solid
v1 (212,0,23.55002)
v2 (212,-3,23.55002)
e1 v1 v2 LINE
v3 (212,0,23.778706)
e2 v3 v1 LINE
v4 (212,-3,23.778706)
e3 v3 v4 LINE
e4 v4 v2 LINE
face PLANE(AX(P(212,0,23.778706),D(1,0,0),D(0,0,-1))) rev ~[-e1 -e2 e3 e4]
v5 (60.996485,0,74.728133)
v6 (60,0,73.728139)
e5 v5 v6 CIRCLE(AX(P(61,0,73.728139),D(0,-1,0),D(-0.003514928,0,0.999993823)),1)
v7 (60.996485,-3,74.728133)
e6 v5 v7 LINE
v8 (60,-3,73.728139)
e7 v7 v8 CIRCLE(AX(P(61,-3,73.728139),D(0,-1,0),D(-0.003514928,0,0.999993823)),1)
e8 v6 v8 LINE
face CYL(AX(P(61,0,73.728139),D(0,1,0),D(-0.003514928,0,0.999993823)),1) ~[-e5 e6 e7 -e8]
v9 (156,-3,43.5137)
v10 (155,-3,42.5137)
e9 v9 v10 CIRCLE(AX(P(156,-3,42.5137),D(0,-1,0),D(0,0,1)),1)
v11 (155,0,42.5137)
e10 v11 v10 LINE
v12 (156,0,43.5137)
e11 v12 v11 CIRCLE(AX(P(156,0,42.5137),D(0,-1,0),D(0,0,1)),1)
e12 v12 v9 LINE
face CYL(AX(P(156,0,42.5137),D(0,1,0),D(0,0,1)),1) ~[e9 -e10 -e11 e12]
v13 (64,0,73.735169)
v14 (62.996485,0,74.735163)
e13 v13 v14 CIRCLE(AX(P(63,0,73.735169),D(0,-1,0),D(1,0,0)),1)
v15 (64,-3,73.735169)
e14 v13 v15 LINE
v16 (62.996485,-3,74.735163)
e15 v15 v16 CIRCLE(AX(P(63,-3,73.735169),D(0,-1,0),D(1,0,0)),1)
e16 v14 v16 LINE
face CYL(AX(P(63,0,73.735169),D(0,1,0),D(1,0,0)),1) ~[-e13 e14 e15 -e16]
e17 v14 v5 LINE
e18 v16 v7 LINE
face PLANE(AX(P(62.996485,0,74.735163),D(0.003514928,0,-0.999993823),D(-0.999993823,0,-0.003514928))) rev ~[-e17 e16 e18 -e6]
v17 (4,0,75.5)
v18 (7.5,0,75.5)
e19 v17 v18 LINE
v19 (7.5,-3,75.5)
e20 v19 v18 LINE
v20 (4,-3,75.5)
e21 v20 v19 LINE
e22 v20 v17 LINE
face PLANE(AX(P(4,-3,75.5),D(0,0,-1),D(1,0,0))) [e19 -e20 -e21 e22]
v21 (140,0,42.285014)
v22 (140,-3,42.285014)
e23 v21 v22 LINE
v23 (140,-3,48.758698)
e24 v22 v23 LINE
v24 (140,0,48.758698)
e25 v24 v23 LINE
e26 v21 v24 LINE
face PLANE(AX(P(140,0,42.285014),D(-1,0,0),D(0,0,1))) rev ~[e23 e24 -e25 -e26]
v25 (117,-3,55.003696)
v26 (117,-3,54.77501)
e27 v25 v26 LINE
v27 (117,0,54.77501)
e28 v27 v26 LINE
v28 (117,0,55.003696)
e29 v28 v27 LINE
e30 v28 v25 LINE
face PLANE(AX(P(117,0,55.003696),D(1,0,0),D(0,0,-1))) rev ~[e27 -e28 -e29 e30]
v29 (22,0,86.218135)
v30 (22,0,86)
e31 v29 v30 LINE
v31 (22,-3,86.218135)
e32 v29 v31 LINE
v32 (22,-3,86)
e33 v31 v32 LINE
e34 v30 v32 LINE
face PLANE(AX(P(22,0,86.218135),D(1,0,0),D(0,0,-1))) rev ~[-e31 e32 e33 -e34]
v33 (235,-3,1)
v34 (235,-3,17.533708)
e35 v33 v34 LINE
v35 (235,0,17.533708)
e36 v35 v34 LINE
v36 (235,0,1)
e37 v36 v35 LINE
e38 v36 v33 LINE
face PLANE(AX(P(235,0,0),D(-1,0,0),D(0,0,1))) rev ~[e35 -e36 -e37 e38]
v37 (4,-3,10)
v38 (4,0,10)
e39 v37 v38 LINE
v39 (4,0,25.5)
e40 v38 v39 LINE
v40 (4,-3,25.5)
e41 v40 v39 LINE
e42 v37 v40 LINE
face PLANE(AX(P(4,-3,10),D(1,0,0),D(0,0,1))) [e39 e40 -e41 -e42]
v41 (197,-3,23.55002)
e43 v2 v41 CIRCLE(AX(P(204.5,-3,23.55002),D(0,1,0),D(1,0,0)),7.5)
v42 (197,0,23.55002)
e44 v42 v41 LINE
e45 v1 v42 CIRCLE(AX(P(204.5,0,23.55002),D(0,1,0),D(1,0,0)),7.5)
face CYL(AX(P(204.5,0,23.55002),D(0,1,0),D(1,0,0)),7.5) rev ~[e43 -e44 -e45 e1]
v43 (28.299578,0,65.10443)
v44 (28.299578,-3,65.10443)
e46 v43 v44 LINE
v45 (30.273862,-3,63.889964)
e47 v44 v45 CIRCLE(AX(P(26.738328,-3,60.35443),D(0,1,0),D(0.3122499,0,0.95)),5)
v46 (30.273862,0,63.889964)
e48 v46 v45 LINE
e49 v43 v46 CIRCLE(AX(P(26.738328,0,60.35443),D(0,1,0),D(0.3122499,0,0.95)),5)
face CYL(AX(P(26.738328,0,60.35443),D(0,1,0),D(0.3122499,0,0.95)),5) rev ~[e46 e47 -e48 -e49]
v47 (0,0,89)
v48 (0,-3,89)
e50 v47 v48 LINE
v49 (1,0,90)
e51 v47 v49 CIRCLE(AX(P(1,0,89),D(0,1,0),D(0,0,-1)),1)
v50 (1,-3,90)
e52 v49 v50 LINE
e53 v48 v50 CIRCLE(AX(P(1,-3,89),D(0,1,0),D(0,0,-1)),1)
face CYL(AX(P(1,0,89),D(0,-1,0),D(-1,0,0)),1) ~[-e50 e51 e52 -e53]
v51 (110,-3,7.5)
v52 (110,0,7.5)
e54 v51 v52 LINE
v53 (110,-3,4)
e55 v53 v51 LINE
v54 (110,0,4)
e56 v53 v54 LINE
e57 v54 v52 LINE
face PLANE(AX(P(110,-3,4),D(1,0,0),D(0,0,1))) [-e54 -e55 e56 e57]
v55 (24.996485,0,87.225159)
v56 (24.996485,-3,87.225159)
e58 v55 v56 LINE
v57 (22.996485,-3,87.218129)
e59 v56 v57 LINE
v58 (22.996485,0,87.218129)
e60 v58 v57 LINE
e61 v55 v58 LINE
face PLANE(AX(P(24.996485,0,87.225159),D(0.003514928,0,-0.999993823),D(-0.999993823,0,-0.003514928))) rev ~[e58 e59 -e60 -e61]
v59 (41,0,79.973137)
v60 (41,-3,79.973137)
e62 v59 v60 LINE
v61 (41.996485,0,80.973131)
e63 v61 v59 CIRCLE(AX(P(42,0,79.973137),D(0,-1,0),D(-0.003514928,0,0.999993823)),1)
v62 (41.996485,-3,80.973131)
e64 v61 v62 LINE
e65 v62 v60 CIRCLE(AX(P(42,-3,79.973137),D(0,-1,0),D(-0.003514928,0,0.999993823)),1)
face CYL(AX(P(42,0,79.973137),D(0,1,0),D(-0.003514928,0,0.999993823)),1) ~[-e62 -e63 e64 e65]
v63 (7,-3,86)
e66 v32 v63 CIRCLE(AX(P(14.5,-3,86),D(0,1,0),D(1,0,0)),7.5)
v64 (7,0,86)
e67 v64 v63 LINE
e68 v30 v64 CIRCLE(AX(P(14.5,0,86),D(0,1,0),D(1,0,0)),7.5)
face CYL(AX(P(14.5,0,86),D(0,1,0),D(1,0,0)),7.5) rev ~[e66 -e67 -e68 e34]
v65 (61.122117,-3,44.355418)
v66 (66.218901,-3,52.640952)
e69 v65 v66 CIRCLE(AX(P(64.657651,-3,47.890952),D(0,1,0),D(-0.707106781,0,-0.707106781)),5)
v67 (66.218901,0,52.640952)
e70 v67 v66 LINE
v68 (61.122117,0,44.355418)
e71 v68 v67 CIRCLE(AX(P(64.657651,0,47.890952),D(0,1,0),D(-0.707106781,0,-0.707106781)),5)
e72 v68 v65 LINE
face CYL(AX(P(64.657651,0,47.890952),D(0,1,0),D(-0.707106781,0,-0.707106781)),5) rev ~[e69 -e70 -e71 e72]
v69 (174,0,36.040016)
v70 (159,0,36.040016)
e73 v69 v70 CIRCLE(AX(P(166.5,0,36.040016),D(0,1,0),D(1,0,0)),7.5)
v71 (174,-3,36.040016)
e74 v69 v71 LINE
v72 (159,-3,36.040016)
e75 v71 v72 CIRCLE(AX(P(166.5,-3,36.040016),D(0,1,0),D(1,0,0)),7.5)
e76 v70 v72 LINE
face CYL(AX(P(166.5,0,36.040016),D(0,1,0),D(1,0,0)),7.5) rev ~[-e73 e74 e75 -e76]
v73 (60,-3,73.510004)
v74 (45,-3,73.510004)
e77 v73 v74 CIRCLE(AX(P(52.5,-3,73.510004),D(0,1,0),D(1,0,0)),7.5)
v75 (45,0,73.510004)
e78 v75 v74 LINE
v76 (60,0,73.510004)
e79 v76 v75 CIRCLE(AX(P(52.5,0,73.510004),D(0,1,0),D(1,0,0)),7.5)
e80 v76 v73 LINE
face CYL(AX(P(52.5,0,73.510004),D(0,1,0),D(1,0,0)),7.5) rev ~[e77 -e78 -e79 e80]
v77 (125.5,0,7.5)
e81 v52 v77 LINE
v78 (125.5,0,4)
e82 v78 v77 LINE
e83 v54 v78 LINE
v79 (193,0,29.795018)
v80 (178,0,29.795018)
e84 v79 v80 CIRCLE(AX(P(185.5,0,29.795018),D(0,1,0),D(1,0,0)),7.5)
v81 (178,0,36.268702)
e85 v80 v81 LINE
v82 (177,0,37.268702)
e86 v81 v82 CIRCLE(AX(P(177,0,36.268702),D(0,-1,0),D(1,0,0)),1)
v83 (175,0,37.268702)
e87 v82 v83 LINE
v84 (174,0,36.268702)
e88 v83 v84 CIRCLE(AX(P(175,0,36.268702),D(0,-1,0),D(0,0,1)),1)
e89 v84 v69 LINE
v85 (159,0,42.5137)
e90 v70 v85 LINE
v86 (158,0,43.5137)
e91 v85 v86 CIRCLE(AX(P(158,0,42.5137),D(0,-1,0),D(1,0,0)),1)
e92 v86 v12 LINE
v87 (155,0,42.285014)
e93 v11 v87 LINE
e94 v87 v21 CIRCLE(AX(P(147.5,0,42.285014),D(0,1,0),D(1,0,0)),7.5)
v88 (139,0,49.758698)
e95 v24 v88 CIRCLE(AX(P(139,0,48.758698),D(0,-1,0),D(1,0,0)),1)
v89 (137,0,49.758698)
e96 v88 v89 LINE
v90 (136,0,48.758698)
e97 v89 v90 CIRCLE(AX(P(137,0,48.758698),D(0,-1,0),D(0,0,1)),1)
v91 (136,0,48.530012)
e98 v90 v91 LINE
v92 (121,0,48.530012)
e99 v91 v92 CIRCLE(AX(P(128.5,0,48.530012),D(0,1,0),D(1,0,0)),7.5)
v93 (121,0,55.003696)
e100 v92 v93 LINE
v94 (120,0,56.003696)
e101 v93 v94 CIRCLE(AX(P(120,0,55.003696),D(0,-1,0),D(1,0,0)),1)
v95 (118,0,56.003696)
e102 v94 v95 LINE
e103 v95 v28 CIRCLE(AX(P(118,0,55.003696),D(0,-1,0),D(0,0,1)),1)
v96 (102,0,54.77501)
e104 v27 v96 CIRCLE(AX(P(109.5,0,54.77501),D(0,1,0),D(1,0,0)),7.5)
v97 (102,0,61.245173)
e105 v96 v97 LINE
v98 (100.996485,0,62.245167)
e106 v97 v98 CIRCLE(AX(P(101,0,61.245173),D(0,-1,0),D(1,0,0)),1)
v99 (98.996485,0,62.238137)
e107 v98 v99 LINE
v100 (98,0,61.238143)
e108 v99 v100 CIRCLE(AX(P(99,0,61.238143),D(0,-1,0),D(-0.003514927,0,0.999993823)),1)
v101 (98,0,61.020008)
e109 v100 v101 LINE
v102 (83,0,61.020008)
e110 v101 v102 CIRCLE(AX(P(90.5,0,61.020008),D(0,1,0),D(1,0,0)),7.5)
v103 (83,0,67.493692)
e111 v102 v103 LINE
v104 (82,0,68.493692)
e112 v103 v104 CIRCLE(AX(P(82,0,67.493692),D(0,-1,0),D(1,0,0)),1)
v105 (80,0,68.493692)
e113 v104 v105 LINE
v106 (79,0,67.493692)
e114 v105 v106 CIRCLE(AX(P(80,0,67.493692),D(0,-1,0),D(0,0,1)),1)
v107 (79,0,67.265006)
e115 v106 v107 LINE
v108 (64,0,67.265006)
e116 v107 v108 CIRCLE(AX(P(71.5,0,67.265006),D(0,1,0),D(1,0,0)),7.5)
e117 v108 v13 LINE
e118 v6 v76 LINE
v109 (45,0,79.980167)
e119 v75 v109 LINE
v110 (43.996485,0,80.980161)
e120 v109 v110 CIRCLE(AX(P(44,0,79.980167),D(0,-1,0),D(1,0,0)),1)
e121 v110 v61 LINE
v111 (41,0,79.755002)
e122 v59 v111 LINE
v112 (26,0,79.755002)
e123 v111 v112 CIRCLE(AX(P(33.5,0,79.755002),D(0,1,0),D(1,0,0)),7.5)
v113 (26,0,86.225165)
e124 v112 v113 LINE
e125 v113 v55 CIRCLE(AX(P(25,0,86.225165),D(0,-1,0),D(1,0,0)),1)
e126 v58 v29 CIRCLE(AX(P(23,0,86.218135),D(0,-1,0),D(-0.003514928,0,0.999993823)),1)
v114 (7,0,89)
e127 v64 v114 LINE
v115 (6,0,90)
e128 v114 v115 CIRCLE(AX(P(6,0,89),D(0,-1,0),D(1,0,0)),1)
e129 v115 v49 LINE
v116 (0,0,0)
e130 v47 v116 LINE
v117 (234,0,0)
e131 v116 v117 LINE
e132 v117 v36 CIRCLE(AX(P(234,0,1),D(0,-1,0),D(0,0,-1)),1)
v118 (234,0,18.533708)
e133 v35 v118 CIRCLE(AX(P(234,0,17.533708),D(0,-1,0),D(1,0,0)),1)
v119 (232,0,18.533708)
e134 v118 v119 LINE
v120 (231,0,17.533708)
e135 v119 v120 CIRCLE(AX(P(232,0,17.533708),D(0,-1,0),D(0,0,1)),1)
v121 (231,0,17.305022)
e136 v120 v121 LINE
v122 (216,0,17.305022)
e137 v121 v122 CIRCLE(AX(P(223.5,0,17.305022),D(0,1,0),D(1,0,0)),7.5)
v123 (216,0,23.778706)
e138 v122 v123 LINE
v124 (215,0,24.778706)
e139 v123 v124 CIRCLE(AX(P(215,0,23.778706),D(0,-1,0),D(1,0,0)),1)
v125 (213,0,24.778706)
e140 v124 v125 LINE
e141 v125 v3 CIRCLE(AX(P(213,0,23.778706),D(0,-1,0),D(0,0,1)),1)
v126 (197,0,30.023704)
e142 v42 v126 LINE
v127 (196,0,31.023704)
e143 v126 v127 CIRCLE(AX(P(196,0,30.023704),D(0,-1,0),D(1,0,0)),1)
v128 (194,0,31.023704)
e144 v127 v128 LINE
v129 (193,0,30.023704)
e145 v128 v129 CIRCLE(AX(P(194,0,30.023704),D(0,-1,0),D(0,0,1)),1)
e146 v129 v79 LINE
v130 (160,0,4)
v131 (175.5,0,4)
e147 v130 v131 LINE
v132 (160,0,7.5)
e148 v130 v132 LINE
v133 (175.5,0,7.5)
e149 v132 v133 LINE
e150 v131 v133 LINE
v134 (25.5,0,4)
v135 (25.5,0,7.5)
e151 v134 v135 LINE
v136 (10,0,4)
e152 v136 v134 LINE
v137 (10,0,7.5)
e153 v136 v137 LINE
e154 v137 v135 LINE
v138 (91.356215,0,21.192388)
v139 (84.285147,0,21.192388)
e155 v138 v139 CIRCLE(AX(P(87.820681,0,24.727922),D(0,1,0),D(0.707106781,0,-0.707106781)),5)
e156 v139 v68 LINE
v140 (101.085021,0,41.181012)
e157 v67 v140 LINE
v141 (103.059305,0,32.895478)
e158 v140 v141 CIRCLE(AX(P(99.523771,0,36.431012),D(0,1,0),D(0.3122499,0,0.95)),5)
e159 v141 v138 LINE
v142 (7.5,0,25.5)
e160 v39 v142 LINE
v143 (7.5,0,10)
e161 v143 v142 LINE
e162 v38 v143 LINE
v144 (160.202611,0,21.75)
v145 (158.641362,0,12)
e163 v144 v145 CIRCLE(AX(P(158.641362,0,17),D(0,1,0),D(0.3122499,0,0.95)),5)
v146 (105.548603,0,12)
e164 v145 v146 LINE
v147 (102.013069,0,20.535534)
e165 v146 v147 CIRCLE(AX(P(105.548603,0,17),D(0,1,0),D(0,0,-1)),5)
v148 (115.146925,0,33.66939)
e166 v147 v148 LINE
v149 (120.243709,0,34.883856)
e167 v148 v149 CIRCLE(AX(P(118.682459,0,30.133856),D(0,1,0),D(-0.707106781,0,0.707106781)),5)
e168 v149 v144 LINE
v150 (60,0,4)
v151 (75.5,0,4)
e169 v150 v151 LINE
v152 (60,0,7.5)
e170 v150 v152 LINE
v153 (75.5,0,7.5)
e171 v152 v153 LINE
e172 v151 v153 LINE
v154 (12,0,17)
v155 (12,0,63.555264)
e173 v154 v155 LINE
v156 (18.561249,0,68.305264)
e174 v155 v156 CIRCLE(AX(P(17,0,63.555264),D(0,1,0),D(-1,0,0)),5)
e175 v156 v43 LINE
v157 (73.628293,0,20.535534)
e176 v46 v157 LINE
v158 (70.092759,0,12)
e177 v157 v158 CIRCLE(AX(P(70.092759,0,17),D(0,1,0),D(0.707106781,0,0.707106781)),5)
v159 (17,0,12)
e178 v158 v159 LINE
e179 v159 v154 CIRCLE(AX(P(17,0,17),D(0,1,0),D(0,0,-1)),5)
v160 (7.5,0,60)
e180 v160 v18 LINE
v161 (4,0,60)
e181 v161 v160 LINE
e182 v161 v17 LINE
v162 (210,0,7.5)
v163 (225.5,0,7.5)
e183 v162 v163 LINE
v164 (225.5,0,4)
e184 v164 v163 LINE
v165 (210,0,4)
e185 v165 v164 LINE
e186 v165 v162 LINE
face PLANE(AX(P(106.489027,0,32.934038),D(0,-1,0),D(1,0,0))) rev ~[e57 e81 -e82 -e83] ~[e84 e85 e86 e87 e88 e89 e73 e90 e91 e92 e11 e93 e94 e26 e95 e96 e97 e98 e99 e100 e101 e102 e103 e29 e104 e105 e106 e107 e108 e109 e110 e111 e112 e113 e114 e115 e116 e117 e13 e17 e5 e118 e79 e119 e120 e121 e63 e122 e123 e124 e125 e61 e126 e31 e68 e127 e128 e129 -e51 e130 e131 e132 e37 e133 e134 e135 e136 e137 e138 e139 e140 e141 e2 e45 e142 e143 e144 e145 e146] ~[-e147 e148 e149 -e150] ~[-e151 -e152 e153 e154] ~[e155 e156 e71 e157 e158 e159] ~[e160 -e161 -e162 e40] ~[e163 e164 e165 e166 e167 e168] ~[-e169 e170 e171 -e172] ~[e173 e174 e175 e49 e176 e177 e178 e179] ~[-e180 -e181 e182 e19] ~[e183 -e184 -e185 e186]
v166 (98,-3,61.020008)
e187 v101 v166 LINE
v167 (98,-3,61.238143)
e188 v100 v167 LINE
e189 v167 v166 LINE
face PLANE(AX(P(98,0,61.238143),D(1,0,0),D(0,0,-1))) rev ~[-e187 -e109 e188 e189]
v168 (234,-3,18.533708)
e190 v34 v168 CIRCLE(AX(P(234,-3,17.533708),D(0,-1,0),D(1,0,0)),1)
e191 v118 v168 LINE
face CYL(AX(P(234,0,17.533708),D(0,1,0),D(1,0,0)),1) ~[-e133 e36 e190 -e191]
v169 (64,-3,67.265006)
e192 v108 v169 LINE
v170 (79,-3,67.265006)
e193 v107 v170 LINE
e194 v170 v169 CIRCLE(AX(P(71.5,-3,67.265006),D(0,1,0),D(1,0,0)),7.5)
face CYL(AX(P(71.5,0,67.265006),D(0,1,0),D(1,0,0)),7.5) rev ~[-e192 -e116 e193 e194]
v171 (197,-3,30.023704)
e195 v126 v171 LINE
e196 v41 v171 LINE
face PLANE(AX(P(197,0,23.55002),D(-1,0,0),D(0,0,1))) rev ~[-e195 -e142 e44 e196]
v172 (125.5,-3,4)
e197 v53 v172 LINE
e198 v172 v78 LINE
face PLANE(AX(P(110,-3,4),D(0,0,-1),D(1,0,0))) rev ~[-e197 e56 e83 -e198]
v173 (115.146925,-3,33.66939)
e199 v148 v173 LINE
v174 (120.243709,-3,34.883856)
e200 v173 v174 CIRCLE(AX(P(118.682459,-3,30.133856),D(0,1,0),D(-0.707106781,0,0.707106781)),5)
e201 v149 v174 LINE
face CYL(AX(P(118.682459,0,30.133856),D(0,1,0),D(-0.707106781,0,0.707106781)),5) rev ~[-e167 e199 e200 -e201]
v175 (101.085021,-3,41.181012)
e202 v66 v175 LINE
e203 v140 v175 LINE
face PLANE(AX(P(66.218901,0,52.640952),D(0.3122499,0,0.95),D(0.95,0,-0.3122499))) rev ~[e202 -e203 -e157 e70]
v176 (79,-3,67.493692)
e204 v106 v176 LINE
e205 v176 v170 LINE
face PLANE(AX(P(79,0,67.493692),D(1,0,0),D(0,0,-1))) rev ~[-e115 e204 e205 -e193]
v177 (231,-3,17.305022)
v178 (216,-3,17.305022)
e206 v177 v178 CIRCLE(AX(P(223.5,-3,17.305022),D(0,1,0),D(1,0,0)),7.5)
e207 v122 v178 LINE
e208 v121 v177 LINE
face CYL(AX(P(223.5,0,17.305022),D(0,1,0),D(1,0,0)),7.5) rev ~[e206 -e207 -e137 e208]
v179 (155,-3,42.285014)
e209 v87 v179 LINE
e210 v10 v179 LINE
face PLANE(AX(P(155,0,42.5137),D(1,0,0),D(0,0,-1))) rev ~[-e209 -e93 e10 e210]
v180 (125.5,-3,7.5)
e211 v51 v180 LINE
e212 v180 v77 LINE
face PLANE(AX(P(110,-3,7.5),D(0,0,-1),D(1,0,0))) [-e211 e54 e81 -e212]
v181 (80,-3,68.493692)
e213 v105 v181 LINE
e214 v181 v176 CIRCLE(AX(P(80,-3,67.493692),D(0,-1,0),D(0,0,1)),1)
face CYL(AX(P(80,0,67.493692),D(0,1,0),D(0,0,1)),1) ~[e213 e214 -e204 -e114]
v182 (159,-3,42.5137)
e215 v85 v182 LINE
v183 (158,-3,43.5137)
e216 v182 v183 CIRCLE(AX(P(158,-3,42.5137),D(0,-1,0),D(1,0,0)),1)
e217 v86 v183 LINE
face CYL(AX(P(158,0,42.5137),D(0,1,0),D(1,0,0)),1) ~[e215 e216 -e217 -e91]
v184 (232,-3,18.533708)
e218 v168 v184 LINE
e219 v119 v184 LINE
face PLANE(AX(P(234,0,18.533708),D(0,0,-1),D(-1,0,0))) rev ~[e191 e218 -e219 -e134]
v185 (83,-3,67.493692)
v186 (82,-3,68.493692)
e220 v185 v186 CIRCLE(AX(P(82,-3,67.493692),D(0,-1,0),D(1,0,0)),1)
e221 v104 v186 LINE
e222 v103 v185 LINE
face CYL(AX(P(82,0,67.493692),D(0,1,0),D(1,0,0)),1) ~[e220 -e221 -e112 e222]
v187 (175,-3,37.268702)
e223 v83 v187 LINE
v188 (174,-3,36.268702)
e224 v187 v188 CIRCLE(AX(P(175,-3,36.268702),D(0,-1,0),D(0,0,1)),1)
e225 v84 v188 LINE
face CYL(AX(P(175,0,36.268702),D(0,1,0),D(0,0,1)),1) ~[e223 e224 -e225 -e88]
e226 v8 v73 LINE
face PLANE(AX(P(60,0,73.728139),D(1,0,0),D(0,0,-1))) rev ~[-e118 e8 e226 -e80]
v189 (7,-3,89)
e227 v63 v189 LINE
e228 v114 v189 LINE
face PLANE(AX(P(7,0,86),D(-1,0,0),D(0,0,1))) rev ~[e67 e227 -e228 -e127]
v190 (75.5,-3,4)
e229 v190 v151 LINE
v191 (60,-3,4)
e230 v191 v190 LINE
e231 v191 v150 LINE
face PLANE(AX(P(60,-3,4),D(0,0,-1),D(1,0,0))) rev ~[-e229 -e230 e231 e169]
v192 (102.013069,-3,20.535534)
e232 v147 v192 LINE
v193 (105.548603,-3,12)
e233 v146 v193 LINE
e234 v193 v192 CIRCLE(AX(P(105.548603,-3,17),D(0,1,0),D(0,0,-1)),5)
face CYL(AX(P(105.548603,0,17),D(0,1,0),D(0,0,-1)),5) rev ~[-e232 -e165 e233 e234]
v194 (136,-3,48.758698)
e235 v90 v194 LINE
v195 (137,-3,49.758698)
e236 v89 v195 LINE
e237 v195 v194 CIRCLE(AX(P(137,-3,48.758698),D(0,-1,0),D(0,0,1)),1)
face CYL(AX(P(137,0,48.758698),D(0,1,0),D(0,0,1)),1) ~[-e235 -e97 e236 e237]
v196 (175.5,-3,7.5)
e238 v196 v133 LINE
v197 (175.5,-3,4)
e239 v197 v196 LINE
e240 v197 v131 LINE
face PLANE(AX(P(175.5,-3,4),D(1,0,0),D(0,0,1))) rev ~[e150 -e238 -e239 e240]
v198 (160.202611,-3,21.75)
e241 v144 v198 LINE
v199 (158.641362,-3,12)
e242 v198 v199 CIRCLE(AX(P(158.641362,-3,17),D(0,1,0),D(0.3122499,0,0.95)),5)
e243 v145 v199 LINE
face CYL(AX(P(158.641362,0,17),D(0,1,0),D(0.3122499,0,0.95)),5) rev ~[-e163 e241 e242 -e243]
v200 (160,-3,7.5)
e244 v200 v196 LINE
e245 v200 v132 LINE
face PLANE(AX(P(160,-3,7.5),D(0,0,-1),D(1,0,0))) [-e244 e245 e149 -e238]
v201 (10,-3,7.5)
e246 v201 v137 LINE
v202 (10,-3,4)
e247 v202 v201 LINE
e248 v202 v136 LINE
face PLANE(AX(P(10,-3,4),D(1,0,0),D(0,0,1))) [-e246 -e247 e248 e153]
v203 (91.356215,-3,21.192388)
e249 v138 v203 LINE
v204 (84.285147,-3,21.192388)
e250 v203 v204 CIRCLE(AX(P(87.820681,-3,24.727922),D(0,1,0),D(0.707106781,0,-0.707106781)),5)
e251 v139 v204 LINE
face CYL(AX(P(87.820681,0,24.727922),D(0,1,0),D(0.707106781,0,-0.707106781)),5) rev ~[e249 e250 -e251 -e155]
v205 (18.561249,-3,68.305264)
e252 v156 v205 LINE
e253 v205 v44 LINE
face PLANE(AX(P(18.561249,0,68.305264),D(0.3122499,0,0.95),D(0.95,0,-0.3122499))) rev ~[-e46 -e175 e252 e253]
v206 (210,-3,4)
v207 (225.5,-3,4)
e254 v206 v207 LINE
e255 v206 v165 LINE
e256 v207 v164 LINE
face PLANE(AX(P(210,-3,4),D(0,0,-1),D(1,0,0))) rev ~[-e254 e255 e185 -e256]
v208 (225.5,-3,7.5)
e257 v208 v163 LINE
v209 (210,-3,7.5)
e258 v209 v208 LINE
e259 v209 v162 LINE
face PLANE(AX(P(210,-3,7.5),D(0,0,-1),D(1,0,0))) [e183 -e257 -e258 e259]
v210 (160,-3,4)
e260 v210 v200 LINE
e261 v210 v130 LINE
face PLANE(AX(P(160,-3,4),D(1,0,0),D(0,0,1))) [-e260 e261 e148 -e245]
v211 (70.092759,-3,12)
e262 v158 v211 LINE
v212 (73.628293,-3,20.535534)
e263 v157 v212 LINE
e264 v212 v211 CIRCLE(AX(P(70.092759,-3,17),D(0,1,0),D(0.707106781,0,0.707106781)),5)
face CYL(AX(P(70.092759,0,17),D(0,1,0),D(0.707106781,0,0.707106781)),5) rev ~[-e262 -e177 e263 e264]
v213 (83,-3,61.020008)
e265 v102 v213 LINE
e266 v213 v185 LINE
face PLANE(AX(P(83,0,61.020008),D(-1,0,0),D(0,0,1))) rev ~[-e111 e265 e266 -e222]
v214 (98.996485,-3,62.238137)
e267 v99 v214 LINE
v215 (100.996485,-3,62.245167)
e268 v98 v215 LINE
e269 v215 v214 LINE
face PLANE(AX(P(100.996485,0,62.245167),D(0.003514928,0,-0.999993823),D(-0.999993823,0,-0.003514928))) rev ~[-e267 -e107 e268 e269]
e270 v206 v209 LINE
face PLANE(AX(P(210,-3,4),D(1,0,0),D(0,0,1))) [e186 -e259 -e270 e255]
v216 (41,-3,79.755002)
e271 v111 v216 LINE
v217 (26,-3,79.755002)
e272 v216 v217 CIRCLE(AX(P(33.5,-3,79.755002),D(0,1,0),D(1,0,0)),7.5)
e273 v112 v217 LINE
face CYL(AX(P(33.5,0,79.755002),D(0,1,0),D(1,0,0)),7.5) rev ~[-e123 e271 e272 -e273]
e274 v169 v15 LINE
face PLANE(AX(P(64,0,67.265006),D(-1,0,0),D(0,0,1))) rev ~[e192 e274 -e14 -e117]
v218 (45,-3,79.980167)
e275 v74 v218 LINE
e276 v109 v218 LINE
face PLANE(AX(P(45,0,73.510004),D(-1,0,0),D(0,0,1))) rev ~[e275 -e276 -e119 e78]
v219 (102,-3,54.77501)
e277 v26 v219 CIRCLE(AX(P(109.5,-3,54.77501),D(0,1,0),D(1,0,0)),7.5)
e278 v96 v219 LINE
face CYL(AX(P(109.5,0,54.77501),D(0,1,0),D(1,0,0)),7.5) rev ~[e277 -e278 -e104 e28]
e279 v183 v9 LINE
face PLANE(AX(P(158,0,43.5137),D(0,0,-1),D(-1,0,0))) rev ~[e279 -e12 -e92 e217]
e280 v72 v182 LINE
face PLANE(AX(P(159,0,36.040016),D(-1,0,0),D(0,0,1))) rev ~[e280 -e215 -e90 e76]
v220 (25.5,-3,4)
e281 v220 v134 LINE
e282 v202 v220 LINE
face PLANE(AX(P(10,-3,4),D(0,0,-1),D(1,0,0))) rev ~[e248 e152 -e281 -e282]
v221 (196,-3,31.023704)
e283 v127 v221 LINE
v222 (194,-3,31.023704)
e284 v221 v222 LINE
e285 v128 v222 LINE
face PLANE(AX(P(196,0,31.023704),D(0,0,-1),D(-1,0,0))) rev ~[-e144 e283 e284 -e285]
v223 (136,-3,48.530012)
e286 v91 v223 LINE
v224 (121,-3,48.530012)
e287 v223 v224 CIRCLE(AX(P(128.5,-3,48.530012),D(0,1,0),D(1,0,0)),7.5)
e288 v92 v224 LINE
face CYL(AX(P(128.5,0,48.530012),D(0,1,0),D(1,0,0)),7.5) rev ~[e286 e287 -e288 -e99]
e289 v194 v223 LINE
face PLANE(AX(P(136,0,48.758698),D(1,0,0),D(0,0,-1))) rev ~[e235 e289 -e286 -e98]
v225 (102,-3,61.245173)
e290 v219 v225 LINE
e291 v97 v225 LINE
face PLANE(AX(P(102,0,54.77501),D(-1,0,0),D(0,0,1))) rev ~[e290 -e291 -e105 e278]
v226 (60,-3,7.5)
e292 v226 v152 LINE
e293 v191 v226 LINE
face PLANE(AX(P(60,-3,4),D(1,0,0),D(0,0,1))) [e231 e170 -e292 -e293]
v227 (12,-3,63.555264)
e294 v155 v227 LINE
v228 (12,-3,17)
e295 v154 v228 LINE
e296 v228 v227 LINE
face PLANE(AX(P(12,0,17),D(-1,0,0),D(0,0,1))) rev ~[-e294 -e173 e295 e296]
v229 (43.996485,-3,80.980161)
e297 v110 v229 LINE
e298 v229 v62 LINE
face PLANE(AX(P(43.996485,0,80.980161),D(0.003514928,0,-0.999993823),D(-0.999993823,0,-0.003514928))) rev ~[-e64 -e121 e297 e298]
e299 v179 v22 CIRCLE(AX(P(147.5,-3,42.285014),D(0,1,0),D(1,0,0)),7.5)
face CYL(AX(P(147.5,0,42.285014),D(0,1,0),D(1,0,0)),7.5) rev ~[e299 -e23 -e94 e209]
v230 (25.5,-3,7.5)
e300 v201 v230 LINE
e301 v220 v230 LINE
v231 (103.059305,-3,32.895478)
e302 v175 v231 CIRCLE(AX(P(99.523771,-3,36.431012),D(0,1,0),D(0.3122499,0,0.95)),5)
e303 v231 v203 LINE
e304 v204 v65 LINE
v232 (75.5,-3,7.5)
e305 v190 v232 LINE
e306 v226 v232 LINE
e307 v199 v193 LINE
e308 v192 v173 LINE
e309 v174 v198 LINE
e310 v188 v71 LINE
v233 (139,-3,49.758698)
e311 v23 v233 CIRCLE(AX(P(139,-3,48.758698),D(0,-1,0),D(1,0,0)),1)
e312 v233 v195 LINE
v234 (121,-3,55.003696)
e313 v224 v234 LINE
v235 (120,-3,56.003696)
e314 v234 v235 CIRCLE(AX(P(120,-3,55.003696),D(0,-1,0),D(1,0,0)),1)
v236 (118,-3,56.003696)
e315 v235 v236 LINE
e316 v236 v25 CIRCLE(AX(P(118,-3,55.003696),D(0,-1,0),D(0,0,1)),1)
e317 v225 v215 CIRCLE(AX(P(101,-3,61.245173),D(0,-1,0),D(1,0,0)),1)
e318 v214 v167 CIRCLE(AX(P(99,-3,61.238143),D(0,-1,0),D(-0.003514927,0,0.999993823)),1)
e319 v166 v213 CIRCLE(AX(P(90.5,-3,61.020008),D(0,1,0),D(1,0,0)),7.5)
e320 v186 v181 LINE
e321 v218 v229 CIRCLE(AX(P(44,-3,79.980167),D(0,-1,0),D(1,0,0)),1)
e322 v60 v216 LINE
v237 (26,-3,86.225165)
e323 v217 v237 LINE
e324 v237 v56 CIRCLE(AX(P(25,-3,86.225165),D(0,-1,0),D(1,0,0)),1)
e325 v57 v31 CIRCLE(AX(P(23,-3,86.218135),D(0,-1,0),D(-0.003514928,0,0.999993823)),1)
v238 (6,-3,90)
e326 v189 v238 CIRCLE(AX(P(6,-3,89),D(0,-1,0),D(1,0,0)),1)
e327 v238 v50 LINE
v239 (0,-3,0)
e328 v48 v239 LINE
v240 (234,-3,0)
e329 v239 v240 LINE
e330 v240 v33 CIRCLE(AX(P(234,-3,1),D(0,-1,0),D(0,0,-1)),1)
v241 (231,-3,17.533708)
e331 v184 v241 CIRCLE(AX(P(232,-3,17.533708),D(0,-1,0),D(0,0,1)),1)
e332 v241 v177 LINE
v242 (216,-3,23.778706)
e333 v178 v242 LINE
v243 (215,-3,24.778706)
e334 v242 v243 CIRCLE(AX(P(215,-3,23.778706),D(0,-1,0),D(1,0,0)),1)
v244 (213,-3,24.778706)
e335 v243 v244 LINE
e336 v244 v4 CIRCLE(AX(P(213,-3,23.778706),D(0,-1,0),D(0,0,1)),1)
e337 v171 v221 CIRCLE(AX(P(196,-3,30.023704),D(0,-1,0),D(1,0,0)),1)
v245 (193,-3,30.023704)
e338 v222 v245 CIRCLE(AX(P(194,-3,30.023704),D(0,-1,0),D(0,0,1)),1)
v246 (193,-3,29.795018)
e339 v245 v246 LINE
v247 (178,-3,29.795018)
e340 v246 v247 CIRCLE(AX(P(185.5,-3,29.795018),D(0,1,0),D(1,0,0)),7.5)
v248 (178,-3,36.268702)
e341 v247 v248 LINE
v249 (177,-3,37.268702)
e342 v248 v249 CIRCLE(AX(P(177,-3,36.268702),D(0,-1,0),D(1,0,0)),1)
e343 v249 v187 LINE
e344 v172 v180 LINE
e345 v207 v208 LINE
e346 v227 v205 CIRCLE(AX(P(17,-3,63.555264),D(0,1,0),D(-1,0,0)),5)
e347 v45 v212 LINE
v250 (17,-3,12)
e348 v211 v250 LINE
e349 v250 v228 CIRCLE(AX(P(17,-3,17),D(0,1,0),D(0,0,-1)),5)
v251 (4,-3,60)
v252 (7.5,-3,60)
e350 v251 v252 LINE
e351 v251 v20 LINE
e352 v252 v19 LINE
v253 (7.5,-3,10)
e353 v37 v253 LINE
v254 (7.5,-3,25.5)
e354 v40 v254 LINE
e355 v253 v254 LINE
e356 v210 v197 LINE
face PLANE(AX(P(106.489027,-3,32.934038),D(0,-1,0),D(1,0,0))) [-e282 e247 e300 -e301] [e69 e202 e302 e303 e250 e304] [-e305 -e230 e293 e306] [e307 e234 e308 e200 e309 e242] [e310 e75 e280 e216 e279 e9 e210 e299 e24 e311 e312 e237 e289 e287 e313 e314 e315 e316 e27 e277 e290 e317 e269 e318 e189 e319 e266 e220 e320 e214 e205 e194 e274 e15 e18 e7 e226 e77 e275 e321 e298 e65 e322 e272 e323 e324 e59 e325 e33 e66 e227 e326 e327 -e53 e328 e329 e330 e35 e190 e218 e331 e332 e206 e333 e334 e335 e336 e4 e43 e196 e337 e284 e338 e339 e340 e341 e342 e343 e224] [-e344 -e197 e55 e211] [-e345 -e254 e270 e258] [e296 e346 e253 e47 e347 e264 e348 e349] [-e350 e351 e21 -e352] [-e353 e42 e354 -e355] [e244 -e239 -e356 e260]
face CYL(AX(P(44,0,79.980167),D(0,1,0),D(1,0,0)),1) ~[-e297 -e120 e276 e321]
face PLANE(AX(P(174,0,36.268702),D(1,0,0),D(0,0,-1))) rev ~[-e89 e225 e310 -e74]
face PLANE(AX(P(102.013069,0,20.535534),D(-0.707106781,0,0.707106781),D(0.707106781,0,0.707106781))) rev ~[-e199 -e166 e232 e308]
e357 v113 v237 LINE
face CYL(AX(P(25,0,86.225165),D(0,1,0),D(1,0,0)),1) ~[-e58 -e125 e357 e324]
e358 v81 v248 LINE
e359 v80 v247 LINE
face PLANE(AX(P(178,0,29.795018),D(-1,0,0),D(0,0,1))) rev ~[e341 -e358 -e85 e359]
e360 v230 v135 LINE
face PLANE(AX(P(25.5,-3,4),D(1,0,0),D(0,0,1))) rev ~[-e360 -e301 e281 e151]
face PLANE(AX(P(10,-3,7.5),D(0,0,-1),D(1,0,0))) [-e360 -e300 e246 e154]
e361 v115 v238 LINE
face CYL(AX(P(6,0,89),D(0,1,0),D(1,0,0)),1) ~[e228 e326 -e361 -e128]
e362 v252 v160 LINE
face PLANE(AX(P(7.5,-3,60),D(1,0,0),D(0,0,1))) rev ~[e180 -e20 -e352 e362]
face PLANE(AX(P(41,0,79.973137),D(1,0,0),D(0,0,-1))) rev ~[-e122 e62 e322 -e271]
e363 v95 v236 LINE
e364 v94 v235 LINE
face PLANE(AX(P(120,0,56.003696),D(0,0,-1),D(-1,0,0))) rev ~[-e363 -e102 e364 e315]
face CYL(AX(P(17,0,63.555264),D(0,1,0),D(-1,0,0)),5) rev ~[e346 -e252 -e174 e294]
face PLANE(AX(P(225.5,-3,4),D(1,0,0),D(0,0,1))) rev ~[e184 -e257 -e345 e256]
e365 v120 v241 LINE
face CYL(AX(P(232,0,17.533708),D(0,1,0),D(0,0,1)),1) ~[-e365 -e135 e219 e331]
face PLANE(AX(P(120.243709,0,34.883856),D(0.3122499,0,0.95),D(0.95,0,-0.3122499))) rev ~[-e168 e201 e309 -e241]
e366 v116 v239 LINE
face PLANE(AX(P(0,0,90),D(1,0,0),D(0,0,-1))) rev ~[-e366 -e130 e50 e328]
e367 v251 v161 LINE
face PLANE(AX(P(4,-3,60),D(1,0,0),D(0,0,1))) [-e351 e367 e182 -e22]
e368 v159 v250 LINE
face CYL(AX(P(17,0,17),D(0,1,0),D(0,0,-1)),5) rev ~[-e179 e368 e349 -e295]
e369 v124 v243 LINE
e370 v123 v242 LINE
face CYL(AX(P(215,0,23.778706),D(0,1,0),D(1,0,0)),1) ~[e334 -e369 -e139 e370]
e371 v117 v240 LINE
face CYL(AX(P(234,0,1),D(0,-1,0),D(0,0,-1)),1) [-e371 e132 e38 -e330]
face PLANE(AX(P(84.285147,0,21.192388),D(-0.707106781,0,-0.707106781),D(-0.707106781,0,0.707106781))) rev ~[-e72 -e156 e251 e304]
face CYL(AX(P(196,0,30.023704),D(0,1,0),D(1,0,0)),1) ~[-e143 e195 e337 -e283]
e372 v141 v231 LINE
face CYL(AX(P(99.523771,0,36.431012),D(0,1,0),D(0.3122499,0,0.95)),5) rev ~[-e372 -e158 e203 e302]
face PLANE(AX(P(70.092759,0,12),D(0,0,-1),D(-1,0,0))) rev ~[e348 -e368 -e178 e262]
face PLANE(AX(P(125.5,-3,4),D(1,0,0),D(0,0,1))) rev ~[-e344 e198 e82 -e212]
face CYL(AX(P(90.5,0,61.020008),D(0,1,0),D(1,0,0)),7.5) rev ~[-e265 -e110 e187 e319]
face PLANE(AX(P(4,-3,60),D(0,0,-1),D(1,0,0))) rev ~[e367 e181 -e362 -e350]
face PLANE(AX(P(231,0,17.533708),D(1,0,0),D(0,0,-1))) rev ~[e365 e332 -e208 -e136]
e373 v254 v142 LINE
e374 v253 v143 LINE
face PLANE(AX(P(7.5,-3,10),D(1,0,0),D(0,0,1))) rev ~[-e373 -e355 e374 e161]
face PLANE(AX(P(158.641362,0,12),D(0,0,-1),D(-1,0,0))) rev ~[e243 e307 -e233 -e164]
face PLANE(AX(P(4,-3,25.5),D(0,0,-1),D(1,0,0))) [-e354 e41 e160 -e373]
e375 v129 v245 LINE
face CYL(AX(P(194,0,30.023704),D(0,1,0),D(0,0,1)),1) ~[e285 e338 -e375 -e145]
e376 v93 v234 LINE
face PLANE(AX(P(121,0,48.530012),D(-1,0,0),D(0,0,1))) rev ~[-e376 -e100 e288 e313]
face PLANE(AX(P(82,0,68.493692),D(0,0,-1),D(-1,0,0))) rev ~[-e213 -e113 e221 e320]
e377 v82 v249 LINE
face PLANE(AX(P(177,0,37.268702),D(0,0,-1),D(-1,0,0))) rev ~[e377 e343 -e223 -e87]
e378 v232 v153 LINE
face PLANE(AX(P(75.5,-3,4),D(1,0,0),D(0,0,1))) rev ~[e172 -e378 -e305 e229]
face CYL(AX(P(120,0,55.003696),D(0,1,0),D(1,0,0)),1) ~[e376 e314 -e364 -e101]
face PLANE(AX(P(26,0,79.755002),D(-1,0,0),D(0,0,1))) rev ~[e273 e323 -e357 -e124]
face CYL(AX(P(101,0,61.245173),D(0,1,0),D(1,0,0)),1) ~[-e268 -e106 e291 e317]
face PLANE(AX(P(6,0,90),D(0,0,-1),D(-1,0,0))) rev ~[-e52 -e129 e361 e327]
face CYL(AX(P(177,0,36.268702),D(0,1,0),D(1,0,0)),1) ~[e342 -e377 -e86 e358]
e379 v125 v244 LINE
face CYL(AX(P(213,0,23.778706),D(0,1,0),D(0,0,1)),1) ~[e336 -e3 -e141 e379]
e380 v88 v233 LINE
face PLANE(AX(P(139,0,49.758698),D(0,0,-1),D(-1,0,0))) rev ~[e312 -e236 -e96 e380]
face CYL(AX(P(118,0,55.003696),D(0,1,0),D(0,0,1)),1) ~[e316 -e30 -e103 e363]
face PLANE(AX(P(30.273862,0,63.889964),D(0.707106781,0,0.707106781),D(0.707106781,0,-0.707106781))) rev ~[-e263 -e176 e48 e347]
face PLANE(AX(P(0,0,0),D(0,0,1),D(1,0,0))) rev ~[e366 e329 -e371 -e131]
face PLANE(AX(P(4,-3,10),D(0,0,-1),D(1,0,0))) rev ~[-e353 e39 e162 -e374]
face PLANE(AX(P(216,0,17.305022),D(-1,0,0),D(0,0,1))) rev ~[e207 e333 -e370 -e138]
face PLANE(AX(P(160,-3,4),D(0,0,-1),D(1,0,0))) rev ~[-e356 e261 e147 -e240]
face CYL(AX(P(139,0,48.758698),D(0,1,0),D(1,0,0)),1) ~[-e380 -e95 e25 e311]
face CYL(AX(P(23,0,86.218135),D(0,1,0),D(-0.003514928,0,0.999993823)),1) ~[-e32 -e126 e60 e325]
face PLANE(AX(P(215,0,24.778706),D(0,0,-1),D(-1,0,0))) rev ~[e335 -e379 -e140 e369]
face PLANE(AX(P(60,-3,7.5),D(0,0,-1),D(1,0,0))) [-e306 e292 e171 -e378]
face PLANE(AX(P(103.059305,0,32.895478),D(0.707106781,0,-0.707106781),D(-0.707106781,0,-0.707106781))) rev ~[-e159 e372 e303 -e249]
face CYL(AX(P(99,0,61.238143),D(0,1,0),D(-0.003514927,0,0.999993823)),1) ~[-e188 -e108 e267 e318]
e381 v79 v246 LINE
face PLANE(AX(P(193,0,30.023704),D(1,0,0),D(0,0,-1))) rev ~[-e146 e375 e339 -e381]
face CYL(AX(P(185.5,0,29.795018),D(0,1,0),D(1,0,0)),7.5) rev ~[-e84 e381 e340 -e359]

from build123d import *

# Parameters (mm, degrees)
F1_DEPTH = 3
F2_R     = 1
F3_W     = 15.5
F3_H     = 3.5
F3_W_2   = 3.5
F3_H_2   = 15.5
F4_DEPTH = 25


with BuildPart() as f1:
    # F0 (on Front) → F1 (new body)
    with BuildSketch(Plane.XZ):
        with BuildLine():
            Line((0, 90), (0, 0))
            Line((0, 0), (235, 0))
            Line((235, 0), (235, 17.5337082297))
            ThreePointArc((235, 17.5337082297), (234.7071067812, 18.2408150109), (234, 18.5337082297))
            Line((234, 18.5337082297), (232, 18.5337082297))
            ThreePointArc((232, 18.5337082297), (231.2928932188, 18.2408150109), (231, 17.5337082297))
            Line((231, 17.5337082297), (231, 17.3050220176))
            ThreePointArc((231, 17.3050220176), (223.5, 9.8050220176), (216, 17.3050220176))
            Line((216, 17.3050220176), (216, 21.3050220176))
            Line((216, 21.3050220176), (216, 23.7787062281))
            ThreePointArc((216, 23.7787062281), (215.7071067812, 24.4858130093), (215, 24.7787062281))
            Line((215, 24.7787062281), (213, 24.7787062281))
            ThreePointArc((213, 24.7787062281), (212.2928932188, 24.4858130093), (212, 23.7787062281))
            Line((212, 23.7787062281), (212, 23.550020016))
            ThreePointArc((212, 23.550020016), (204.5, 16.050020016), (197, 23.550020016))
            Line((197, 23.550020016), (197, 27.550020016))
            Line((197, 27.550020016), (197, 30.0237042265))
            ThreePointArc((197, 30.0237042265), (196.7071067812, 30.7308110077), (196, 31.0237042265))
            Line((196, 31.0237042265), (194, 31.0237042265))
            ThreePointArc((194, 31.0237042265), (193.2928932188, 30.7308110077), (193, 30.0237042265))
            Line((193, 30.0237042265), (193, 29.7950180144))
            ThreePointArc((193, 29.7950180144), (185.5, 22.2950180144), (178, 29.7950180144))
            Line((178, 29.7950180144), (178, 33.7950180144))
            Line((178, 33.7950180144), (178, 36.2687022249))
            ThreePointArc((178, 36.2687022249), (177.7071067812, 36.9758090061), (177, 37.2687022249))
            Line((177, 37.2687022249), (175, 37.2687022249))
            ThreePointArc((175, 37.2687022249), (174.2928932188, 36.9758090061), (174, 36.2687022249))
            Line((174, 36.2687022249), (174, 36.0400160128))
            ThreePointArc((174, 36.0400160128), (166.5, 28.5400160128), (159, 36.0400160128))
            Line((159, 36.0400160128), (159, 40.0400160128))
            Line((159, 40.0400160128), (159, 42.5137002233))
            ThreePointArc((159, 42.5137002233), (158.7071067812, 43.2208070045), (158, 43.5137002233))
            Line((158, 43.5137002233), (156, 43.5137002233))
            ThreePointArc((156, 43.5137002233), (155.2928932188, 43.2208070045), (155, 42.5137002233))
            Line((155, 42.5137002233), (155, 42.2850140112))
            ThreePointArc((155, 42.2850140112), (147.5, 34.7850140112), (140, 42.2850140112))
            Line((140, 42.2850140112), (140, 46.2850140112))
            Line((140, 46.2850140112), (140, 48.7586982217))
            ThreePointArc((140, 48.7586982217), (139.7071067812, 49.4658050029), (139, 49.7586982217))
            Line((139, 49.7586982217), (137, 49.7586982217))
            ThreePointArc((137, 49.7586982217), (136.2928932188, 49.4658050029), (136, 48.7586982217))
            Line((136, 48.7586982217), (136, 48.5300120096))
            ThreePointArc((136, 48.5300120096), (128.5, 41.0300120096), (121, 48.5300120096))
            Line((121, 48.5300120096), (121, 52.5300120096))
            Line((121, 52.5300120096), (121, 55.0036962201))
            ThreePointArc((121, 55.0036962201), (120.7071067812, 55.7108030013), (120, 56.0036962201))
            Line((120, 56.0036962201), (118, 56.0036962201))
            ThreePointArc((118, 56.0036962201), (117.2928932188, 55.7108030013), (117, 55.0036962201))
            Line((117, 55.0036962201), (117, 54.775010008))
            ThreePointArc((117, 54.775010008), (109.5, 47.275010008), (102, 54.775010008))
            Line((102, 54.775010008), (102, 58.775010008))
            Line((102, 58.775010008), (102, 61.2451730918))
            ThreePointArc((102, 61.2451730918), (101.7058629727, 61.9535214974), (100.9964850724, 62.2451669144))
            Line((100.9964850724, 62.2451669144), (98.9964850724, 62.2381370157))
            ThreePointArc((98.9964850724, 62.2381370157), (98.2916515943, 61.9440061658), (98, 61.2381431931))
            Line((98, 61.2381431931), (98, 61.0200080064))
            ThreePointArc((98, 61.0200080064), (90.5, 53.5200080064), (83, 61.0200080064))
            Line((83, 61.0200080064), (83, 65.0200080064))
            Line((83, 65.0200080064), (83, 67.4936922169))
            ThreePointArc((83, 67.4936922169), (82.7071067812, 68.2007989981), (82, 68.4936922169))
            Line((82, 68.4936922169), (80, 68.4936922169))
            ThreePointArc((80, 68.4936922169), (79.2928932188, 68.2007989981), (79, 67.4936922169))
            Line((79, 67.4936922169), (79, 67.2650060048))
            ThreePointArc((79, 67.2650060048), (71.5, 59.7650060048), (64, 67.2650060048))
            Line((64, 67.2650060048), (64, 71.2650060048))
            Line((64, 71.2650060048), (64, 73.7351690886))
            ThreePointArc((64, 73.7351690886), (63.7058629727, 74.4435174942), (62.9964850724, 74.7351629112))
            Line((62.9964850724, 74.7351629112), (60.9964850724, 74.7281330125))
            ThreePointArc((60.9964850724, 74.7281330125), (60.2916515943, 74.4340021625), (60, 73.7281391899))
            Line((60, 73.7281391899), (60, 73.5100040032))
            ThreePointArc((60, 73.5100040032), (52.5, 66.0100040032), (45, 73.5100040032))
            Line((45, 73.5100040032), (45, 77.5100040032))
            Line((45, 77.5100040032), (45, 79.980167087))
            ThreePointArc((45, 79.980167087), (44.7058629727, 80.6885154926), (43.9964850724, 80.9801609096))
            Line((43.9964850724, 80.9801609096), (41.9964850724, 80.9731310109))
            ThreePointArc((41.9964850724, 80.9731310109), (41.2916515943, 80.6790001609), (41, 79.9731371883))
            Line((41, 79.9731371883), (41, 79.7550020016))
            ThreePointArc((41, 79.7550020016), (33.5, 72.2550020016), (26, 79.7550020016))
            Line((26, 79.7550020016), (26, 83.7550020016))
            Line((26, 83.7550020016), (26, 86.2251650854))
            ThreePointArc((26, 86.2251650854), (25.7058629727, 86.933513491), (24.9964850724, 87.225158908))
            Line((24.9964850724, 87.225158908), (22.9964850724, 87.2181290093))
            ThreePointArc((22.9964850724, 87.2181290093), (22.2916515943, 86.9239981593), (22, 86.2181351867))
            Line((22, 86.2181351867), (22, 86))
            ThreePointArc((22, 86), (14.5, 78.5), (7, 86))
            Line((7, 86), (7, 89))
            ThreePointArc((7, 89), (6.7071067812, 89.7071067812), (6, 90))
            Line((6, 90), (0, 90))
        make_face()
        with BuildLine():
            ThreePointArc((17, 12), (13.4644660941, 13.4644660941), (12, 17))
            Line((12, 17), (12, 63.5552642114))
            ThreePointArc((12, 63.5552642114), (14.0679569834, 67.6053412167), (18.5612494996, 68.3052642114))
            Line((18.5612494996, 68.3052642114), (28.2995777656, 65.1044304993))
            ThreePointArc((28.2995777656, 65.1044304993), (29.3580672309, 64.6131824005), (30.273862172, 63.8899644052))
            Line((30.273862172, 63.8899644052), (73.6282926713, 20.5355339059))
            ThreePointArc((73.6282926713, 20.5355339059), (74.7121564279, 15.0865828382), (70.0927587654, 12))
            Line((70.0927587654, 12), (17, 12))
        make_face(mode=Mode.SUBTRACT)
        with BuildLine():
            Line((103.0593050185, 32.8954784413), (91.3562147326, 21.1923881554))
            ThreePointArc((91.3562147326, 21.1923881554), (87.8206808267, 19.7279220614), (84.2851469208, 21.1923881554))
            Line((84.2851469208, 21.1923881554), (61.1221171694, 44.3554179068))
            ThreePointArc((61.1221171694, 44.3554179068), (60.3988991741, 50.5106907776), (66.2189005749, 52.6409518128))
            Line((66.2189005749, 52.6409518128), (101.0850206122, 41.1810123472))
            ThreePointArc((101.0850206122, 41.1810123472), (104.3875986483, 37.589969509), (103.0593050185, 32.8954784413))
        make_face(mode=Mode.SUBTRACT)
        with BuildLine():
            ThreePointArc((160.202611153, 21.75), (163.578466068, 16.209430585), (158.6413616534, 12))
            Line((158.6413616534, 12), (105.5486028881, 12))
            ThreePointArc((105.5486028881, 12), (100.9292052255, 15.0865828382), (102.0130689821, 20.5355339059))
            Line((102.0130689821, 20.5355339059), (115.1469251322, 33.669390056))
            ThreePointArc((115.1469251322, 33.669390056), (117.5235018764, 34.9976836858), (120.2437085377, 34.88385615))
            Line((120.2437085377, 34.88385615), (160.202611153, 21.75))
        make_face(mode=Mode.SUBTRACT)
    extrude(amount=F1_DEPTH)

    # F2
    f2_edges = [f1.edges().sort_by_distance(p)[0] for p in [
        (235, -1.5, 0),
        (0, -1.5, 90),
    ]]
    fillet(f2_edges, radius=F2_R)

    # F3 (on face) → F4 (cut)
    with BuildSketch(Plane.XZ.offset(3)):
        with Locations((17.75, 5.75)):
            Rectangle(F3_W, F3_H)
        with Locations((5.75, 17.75)):
            Rectangle(F3_W_2, F3_H_2)
        with Locations((5.75, 67.75)):
            Rectangle(F3_W_2, F3_H_2)
        with Locations((67.75, 5.75)):
            Rectangle(F3_W, F3_H)
        with Locations((117.75, 5.75)):
            Rectangle(F3_W, F3_H)
        with Locations((167.75, 5.75)):
            Rectangle(F3_W, F3_H)
        with Locations((217.75, 5.75)):
            Rectangle(F3_W, F3_H)
    extrude(amount=-F4_DEPTH, mode=Mode.SUBTRACT)


solid = f1.part
